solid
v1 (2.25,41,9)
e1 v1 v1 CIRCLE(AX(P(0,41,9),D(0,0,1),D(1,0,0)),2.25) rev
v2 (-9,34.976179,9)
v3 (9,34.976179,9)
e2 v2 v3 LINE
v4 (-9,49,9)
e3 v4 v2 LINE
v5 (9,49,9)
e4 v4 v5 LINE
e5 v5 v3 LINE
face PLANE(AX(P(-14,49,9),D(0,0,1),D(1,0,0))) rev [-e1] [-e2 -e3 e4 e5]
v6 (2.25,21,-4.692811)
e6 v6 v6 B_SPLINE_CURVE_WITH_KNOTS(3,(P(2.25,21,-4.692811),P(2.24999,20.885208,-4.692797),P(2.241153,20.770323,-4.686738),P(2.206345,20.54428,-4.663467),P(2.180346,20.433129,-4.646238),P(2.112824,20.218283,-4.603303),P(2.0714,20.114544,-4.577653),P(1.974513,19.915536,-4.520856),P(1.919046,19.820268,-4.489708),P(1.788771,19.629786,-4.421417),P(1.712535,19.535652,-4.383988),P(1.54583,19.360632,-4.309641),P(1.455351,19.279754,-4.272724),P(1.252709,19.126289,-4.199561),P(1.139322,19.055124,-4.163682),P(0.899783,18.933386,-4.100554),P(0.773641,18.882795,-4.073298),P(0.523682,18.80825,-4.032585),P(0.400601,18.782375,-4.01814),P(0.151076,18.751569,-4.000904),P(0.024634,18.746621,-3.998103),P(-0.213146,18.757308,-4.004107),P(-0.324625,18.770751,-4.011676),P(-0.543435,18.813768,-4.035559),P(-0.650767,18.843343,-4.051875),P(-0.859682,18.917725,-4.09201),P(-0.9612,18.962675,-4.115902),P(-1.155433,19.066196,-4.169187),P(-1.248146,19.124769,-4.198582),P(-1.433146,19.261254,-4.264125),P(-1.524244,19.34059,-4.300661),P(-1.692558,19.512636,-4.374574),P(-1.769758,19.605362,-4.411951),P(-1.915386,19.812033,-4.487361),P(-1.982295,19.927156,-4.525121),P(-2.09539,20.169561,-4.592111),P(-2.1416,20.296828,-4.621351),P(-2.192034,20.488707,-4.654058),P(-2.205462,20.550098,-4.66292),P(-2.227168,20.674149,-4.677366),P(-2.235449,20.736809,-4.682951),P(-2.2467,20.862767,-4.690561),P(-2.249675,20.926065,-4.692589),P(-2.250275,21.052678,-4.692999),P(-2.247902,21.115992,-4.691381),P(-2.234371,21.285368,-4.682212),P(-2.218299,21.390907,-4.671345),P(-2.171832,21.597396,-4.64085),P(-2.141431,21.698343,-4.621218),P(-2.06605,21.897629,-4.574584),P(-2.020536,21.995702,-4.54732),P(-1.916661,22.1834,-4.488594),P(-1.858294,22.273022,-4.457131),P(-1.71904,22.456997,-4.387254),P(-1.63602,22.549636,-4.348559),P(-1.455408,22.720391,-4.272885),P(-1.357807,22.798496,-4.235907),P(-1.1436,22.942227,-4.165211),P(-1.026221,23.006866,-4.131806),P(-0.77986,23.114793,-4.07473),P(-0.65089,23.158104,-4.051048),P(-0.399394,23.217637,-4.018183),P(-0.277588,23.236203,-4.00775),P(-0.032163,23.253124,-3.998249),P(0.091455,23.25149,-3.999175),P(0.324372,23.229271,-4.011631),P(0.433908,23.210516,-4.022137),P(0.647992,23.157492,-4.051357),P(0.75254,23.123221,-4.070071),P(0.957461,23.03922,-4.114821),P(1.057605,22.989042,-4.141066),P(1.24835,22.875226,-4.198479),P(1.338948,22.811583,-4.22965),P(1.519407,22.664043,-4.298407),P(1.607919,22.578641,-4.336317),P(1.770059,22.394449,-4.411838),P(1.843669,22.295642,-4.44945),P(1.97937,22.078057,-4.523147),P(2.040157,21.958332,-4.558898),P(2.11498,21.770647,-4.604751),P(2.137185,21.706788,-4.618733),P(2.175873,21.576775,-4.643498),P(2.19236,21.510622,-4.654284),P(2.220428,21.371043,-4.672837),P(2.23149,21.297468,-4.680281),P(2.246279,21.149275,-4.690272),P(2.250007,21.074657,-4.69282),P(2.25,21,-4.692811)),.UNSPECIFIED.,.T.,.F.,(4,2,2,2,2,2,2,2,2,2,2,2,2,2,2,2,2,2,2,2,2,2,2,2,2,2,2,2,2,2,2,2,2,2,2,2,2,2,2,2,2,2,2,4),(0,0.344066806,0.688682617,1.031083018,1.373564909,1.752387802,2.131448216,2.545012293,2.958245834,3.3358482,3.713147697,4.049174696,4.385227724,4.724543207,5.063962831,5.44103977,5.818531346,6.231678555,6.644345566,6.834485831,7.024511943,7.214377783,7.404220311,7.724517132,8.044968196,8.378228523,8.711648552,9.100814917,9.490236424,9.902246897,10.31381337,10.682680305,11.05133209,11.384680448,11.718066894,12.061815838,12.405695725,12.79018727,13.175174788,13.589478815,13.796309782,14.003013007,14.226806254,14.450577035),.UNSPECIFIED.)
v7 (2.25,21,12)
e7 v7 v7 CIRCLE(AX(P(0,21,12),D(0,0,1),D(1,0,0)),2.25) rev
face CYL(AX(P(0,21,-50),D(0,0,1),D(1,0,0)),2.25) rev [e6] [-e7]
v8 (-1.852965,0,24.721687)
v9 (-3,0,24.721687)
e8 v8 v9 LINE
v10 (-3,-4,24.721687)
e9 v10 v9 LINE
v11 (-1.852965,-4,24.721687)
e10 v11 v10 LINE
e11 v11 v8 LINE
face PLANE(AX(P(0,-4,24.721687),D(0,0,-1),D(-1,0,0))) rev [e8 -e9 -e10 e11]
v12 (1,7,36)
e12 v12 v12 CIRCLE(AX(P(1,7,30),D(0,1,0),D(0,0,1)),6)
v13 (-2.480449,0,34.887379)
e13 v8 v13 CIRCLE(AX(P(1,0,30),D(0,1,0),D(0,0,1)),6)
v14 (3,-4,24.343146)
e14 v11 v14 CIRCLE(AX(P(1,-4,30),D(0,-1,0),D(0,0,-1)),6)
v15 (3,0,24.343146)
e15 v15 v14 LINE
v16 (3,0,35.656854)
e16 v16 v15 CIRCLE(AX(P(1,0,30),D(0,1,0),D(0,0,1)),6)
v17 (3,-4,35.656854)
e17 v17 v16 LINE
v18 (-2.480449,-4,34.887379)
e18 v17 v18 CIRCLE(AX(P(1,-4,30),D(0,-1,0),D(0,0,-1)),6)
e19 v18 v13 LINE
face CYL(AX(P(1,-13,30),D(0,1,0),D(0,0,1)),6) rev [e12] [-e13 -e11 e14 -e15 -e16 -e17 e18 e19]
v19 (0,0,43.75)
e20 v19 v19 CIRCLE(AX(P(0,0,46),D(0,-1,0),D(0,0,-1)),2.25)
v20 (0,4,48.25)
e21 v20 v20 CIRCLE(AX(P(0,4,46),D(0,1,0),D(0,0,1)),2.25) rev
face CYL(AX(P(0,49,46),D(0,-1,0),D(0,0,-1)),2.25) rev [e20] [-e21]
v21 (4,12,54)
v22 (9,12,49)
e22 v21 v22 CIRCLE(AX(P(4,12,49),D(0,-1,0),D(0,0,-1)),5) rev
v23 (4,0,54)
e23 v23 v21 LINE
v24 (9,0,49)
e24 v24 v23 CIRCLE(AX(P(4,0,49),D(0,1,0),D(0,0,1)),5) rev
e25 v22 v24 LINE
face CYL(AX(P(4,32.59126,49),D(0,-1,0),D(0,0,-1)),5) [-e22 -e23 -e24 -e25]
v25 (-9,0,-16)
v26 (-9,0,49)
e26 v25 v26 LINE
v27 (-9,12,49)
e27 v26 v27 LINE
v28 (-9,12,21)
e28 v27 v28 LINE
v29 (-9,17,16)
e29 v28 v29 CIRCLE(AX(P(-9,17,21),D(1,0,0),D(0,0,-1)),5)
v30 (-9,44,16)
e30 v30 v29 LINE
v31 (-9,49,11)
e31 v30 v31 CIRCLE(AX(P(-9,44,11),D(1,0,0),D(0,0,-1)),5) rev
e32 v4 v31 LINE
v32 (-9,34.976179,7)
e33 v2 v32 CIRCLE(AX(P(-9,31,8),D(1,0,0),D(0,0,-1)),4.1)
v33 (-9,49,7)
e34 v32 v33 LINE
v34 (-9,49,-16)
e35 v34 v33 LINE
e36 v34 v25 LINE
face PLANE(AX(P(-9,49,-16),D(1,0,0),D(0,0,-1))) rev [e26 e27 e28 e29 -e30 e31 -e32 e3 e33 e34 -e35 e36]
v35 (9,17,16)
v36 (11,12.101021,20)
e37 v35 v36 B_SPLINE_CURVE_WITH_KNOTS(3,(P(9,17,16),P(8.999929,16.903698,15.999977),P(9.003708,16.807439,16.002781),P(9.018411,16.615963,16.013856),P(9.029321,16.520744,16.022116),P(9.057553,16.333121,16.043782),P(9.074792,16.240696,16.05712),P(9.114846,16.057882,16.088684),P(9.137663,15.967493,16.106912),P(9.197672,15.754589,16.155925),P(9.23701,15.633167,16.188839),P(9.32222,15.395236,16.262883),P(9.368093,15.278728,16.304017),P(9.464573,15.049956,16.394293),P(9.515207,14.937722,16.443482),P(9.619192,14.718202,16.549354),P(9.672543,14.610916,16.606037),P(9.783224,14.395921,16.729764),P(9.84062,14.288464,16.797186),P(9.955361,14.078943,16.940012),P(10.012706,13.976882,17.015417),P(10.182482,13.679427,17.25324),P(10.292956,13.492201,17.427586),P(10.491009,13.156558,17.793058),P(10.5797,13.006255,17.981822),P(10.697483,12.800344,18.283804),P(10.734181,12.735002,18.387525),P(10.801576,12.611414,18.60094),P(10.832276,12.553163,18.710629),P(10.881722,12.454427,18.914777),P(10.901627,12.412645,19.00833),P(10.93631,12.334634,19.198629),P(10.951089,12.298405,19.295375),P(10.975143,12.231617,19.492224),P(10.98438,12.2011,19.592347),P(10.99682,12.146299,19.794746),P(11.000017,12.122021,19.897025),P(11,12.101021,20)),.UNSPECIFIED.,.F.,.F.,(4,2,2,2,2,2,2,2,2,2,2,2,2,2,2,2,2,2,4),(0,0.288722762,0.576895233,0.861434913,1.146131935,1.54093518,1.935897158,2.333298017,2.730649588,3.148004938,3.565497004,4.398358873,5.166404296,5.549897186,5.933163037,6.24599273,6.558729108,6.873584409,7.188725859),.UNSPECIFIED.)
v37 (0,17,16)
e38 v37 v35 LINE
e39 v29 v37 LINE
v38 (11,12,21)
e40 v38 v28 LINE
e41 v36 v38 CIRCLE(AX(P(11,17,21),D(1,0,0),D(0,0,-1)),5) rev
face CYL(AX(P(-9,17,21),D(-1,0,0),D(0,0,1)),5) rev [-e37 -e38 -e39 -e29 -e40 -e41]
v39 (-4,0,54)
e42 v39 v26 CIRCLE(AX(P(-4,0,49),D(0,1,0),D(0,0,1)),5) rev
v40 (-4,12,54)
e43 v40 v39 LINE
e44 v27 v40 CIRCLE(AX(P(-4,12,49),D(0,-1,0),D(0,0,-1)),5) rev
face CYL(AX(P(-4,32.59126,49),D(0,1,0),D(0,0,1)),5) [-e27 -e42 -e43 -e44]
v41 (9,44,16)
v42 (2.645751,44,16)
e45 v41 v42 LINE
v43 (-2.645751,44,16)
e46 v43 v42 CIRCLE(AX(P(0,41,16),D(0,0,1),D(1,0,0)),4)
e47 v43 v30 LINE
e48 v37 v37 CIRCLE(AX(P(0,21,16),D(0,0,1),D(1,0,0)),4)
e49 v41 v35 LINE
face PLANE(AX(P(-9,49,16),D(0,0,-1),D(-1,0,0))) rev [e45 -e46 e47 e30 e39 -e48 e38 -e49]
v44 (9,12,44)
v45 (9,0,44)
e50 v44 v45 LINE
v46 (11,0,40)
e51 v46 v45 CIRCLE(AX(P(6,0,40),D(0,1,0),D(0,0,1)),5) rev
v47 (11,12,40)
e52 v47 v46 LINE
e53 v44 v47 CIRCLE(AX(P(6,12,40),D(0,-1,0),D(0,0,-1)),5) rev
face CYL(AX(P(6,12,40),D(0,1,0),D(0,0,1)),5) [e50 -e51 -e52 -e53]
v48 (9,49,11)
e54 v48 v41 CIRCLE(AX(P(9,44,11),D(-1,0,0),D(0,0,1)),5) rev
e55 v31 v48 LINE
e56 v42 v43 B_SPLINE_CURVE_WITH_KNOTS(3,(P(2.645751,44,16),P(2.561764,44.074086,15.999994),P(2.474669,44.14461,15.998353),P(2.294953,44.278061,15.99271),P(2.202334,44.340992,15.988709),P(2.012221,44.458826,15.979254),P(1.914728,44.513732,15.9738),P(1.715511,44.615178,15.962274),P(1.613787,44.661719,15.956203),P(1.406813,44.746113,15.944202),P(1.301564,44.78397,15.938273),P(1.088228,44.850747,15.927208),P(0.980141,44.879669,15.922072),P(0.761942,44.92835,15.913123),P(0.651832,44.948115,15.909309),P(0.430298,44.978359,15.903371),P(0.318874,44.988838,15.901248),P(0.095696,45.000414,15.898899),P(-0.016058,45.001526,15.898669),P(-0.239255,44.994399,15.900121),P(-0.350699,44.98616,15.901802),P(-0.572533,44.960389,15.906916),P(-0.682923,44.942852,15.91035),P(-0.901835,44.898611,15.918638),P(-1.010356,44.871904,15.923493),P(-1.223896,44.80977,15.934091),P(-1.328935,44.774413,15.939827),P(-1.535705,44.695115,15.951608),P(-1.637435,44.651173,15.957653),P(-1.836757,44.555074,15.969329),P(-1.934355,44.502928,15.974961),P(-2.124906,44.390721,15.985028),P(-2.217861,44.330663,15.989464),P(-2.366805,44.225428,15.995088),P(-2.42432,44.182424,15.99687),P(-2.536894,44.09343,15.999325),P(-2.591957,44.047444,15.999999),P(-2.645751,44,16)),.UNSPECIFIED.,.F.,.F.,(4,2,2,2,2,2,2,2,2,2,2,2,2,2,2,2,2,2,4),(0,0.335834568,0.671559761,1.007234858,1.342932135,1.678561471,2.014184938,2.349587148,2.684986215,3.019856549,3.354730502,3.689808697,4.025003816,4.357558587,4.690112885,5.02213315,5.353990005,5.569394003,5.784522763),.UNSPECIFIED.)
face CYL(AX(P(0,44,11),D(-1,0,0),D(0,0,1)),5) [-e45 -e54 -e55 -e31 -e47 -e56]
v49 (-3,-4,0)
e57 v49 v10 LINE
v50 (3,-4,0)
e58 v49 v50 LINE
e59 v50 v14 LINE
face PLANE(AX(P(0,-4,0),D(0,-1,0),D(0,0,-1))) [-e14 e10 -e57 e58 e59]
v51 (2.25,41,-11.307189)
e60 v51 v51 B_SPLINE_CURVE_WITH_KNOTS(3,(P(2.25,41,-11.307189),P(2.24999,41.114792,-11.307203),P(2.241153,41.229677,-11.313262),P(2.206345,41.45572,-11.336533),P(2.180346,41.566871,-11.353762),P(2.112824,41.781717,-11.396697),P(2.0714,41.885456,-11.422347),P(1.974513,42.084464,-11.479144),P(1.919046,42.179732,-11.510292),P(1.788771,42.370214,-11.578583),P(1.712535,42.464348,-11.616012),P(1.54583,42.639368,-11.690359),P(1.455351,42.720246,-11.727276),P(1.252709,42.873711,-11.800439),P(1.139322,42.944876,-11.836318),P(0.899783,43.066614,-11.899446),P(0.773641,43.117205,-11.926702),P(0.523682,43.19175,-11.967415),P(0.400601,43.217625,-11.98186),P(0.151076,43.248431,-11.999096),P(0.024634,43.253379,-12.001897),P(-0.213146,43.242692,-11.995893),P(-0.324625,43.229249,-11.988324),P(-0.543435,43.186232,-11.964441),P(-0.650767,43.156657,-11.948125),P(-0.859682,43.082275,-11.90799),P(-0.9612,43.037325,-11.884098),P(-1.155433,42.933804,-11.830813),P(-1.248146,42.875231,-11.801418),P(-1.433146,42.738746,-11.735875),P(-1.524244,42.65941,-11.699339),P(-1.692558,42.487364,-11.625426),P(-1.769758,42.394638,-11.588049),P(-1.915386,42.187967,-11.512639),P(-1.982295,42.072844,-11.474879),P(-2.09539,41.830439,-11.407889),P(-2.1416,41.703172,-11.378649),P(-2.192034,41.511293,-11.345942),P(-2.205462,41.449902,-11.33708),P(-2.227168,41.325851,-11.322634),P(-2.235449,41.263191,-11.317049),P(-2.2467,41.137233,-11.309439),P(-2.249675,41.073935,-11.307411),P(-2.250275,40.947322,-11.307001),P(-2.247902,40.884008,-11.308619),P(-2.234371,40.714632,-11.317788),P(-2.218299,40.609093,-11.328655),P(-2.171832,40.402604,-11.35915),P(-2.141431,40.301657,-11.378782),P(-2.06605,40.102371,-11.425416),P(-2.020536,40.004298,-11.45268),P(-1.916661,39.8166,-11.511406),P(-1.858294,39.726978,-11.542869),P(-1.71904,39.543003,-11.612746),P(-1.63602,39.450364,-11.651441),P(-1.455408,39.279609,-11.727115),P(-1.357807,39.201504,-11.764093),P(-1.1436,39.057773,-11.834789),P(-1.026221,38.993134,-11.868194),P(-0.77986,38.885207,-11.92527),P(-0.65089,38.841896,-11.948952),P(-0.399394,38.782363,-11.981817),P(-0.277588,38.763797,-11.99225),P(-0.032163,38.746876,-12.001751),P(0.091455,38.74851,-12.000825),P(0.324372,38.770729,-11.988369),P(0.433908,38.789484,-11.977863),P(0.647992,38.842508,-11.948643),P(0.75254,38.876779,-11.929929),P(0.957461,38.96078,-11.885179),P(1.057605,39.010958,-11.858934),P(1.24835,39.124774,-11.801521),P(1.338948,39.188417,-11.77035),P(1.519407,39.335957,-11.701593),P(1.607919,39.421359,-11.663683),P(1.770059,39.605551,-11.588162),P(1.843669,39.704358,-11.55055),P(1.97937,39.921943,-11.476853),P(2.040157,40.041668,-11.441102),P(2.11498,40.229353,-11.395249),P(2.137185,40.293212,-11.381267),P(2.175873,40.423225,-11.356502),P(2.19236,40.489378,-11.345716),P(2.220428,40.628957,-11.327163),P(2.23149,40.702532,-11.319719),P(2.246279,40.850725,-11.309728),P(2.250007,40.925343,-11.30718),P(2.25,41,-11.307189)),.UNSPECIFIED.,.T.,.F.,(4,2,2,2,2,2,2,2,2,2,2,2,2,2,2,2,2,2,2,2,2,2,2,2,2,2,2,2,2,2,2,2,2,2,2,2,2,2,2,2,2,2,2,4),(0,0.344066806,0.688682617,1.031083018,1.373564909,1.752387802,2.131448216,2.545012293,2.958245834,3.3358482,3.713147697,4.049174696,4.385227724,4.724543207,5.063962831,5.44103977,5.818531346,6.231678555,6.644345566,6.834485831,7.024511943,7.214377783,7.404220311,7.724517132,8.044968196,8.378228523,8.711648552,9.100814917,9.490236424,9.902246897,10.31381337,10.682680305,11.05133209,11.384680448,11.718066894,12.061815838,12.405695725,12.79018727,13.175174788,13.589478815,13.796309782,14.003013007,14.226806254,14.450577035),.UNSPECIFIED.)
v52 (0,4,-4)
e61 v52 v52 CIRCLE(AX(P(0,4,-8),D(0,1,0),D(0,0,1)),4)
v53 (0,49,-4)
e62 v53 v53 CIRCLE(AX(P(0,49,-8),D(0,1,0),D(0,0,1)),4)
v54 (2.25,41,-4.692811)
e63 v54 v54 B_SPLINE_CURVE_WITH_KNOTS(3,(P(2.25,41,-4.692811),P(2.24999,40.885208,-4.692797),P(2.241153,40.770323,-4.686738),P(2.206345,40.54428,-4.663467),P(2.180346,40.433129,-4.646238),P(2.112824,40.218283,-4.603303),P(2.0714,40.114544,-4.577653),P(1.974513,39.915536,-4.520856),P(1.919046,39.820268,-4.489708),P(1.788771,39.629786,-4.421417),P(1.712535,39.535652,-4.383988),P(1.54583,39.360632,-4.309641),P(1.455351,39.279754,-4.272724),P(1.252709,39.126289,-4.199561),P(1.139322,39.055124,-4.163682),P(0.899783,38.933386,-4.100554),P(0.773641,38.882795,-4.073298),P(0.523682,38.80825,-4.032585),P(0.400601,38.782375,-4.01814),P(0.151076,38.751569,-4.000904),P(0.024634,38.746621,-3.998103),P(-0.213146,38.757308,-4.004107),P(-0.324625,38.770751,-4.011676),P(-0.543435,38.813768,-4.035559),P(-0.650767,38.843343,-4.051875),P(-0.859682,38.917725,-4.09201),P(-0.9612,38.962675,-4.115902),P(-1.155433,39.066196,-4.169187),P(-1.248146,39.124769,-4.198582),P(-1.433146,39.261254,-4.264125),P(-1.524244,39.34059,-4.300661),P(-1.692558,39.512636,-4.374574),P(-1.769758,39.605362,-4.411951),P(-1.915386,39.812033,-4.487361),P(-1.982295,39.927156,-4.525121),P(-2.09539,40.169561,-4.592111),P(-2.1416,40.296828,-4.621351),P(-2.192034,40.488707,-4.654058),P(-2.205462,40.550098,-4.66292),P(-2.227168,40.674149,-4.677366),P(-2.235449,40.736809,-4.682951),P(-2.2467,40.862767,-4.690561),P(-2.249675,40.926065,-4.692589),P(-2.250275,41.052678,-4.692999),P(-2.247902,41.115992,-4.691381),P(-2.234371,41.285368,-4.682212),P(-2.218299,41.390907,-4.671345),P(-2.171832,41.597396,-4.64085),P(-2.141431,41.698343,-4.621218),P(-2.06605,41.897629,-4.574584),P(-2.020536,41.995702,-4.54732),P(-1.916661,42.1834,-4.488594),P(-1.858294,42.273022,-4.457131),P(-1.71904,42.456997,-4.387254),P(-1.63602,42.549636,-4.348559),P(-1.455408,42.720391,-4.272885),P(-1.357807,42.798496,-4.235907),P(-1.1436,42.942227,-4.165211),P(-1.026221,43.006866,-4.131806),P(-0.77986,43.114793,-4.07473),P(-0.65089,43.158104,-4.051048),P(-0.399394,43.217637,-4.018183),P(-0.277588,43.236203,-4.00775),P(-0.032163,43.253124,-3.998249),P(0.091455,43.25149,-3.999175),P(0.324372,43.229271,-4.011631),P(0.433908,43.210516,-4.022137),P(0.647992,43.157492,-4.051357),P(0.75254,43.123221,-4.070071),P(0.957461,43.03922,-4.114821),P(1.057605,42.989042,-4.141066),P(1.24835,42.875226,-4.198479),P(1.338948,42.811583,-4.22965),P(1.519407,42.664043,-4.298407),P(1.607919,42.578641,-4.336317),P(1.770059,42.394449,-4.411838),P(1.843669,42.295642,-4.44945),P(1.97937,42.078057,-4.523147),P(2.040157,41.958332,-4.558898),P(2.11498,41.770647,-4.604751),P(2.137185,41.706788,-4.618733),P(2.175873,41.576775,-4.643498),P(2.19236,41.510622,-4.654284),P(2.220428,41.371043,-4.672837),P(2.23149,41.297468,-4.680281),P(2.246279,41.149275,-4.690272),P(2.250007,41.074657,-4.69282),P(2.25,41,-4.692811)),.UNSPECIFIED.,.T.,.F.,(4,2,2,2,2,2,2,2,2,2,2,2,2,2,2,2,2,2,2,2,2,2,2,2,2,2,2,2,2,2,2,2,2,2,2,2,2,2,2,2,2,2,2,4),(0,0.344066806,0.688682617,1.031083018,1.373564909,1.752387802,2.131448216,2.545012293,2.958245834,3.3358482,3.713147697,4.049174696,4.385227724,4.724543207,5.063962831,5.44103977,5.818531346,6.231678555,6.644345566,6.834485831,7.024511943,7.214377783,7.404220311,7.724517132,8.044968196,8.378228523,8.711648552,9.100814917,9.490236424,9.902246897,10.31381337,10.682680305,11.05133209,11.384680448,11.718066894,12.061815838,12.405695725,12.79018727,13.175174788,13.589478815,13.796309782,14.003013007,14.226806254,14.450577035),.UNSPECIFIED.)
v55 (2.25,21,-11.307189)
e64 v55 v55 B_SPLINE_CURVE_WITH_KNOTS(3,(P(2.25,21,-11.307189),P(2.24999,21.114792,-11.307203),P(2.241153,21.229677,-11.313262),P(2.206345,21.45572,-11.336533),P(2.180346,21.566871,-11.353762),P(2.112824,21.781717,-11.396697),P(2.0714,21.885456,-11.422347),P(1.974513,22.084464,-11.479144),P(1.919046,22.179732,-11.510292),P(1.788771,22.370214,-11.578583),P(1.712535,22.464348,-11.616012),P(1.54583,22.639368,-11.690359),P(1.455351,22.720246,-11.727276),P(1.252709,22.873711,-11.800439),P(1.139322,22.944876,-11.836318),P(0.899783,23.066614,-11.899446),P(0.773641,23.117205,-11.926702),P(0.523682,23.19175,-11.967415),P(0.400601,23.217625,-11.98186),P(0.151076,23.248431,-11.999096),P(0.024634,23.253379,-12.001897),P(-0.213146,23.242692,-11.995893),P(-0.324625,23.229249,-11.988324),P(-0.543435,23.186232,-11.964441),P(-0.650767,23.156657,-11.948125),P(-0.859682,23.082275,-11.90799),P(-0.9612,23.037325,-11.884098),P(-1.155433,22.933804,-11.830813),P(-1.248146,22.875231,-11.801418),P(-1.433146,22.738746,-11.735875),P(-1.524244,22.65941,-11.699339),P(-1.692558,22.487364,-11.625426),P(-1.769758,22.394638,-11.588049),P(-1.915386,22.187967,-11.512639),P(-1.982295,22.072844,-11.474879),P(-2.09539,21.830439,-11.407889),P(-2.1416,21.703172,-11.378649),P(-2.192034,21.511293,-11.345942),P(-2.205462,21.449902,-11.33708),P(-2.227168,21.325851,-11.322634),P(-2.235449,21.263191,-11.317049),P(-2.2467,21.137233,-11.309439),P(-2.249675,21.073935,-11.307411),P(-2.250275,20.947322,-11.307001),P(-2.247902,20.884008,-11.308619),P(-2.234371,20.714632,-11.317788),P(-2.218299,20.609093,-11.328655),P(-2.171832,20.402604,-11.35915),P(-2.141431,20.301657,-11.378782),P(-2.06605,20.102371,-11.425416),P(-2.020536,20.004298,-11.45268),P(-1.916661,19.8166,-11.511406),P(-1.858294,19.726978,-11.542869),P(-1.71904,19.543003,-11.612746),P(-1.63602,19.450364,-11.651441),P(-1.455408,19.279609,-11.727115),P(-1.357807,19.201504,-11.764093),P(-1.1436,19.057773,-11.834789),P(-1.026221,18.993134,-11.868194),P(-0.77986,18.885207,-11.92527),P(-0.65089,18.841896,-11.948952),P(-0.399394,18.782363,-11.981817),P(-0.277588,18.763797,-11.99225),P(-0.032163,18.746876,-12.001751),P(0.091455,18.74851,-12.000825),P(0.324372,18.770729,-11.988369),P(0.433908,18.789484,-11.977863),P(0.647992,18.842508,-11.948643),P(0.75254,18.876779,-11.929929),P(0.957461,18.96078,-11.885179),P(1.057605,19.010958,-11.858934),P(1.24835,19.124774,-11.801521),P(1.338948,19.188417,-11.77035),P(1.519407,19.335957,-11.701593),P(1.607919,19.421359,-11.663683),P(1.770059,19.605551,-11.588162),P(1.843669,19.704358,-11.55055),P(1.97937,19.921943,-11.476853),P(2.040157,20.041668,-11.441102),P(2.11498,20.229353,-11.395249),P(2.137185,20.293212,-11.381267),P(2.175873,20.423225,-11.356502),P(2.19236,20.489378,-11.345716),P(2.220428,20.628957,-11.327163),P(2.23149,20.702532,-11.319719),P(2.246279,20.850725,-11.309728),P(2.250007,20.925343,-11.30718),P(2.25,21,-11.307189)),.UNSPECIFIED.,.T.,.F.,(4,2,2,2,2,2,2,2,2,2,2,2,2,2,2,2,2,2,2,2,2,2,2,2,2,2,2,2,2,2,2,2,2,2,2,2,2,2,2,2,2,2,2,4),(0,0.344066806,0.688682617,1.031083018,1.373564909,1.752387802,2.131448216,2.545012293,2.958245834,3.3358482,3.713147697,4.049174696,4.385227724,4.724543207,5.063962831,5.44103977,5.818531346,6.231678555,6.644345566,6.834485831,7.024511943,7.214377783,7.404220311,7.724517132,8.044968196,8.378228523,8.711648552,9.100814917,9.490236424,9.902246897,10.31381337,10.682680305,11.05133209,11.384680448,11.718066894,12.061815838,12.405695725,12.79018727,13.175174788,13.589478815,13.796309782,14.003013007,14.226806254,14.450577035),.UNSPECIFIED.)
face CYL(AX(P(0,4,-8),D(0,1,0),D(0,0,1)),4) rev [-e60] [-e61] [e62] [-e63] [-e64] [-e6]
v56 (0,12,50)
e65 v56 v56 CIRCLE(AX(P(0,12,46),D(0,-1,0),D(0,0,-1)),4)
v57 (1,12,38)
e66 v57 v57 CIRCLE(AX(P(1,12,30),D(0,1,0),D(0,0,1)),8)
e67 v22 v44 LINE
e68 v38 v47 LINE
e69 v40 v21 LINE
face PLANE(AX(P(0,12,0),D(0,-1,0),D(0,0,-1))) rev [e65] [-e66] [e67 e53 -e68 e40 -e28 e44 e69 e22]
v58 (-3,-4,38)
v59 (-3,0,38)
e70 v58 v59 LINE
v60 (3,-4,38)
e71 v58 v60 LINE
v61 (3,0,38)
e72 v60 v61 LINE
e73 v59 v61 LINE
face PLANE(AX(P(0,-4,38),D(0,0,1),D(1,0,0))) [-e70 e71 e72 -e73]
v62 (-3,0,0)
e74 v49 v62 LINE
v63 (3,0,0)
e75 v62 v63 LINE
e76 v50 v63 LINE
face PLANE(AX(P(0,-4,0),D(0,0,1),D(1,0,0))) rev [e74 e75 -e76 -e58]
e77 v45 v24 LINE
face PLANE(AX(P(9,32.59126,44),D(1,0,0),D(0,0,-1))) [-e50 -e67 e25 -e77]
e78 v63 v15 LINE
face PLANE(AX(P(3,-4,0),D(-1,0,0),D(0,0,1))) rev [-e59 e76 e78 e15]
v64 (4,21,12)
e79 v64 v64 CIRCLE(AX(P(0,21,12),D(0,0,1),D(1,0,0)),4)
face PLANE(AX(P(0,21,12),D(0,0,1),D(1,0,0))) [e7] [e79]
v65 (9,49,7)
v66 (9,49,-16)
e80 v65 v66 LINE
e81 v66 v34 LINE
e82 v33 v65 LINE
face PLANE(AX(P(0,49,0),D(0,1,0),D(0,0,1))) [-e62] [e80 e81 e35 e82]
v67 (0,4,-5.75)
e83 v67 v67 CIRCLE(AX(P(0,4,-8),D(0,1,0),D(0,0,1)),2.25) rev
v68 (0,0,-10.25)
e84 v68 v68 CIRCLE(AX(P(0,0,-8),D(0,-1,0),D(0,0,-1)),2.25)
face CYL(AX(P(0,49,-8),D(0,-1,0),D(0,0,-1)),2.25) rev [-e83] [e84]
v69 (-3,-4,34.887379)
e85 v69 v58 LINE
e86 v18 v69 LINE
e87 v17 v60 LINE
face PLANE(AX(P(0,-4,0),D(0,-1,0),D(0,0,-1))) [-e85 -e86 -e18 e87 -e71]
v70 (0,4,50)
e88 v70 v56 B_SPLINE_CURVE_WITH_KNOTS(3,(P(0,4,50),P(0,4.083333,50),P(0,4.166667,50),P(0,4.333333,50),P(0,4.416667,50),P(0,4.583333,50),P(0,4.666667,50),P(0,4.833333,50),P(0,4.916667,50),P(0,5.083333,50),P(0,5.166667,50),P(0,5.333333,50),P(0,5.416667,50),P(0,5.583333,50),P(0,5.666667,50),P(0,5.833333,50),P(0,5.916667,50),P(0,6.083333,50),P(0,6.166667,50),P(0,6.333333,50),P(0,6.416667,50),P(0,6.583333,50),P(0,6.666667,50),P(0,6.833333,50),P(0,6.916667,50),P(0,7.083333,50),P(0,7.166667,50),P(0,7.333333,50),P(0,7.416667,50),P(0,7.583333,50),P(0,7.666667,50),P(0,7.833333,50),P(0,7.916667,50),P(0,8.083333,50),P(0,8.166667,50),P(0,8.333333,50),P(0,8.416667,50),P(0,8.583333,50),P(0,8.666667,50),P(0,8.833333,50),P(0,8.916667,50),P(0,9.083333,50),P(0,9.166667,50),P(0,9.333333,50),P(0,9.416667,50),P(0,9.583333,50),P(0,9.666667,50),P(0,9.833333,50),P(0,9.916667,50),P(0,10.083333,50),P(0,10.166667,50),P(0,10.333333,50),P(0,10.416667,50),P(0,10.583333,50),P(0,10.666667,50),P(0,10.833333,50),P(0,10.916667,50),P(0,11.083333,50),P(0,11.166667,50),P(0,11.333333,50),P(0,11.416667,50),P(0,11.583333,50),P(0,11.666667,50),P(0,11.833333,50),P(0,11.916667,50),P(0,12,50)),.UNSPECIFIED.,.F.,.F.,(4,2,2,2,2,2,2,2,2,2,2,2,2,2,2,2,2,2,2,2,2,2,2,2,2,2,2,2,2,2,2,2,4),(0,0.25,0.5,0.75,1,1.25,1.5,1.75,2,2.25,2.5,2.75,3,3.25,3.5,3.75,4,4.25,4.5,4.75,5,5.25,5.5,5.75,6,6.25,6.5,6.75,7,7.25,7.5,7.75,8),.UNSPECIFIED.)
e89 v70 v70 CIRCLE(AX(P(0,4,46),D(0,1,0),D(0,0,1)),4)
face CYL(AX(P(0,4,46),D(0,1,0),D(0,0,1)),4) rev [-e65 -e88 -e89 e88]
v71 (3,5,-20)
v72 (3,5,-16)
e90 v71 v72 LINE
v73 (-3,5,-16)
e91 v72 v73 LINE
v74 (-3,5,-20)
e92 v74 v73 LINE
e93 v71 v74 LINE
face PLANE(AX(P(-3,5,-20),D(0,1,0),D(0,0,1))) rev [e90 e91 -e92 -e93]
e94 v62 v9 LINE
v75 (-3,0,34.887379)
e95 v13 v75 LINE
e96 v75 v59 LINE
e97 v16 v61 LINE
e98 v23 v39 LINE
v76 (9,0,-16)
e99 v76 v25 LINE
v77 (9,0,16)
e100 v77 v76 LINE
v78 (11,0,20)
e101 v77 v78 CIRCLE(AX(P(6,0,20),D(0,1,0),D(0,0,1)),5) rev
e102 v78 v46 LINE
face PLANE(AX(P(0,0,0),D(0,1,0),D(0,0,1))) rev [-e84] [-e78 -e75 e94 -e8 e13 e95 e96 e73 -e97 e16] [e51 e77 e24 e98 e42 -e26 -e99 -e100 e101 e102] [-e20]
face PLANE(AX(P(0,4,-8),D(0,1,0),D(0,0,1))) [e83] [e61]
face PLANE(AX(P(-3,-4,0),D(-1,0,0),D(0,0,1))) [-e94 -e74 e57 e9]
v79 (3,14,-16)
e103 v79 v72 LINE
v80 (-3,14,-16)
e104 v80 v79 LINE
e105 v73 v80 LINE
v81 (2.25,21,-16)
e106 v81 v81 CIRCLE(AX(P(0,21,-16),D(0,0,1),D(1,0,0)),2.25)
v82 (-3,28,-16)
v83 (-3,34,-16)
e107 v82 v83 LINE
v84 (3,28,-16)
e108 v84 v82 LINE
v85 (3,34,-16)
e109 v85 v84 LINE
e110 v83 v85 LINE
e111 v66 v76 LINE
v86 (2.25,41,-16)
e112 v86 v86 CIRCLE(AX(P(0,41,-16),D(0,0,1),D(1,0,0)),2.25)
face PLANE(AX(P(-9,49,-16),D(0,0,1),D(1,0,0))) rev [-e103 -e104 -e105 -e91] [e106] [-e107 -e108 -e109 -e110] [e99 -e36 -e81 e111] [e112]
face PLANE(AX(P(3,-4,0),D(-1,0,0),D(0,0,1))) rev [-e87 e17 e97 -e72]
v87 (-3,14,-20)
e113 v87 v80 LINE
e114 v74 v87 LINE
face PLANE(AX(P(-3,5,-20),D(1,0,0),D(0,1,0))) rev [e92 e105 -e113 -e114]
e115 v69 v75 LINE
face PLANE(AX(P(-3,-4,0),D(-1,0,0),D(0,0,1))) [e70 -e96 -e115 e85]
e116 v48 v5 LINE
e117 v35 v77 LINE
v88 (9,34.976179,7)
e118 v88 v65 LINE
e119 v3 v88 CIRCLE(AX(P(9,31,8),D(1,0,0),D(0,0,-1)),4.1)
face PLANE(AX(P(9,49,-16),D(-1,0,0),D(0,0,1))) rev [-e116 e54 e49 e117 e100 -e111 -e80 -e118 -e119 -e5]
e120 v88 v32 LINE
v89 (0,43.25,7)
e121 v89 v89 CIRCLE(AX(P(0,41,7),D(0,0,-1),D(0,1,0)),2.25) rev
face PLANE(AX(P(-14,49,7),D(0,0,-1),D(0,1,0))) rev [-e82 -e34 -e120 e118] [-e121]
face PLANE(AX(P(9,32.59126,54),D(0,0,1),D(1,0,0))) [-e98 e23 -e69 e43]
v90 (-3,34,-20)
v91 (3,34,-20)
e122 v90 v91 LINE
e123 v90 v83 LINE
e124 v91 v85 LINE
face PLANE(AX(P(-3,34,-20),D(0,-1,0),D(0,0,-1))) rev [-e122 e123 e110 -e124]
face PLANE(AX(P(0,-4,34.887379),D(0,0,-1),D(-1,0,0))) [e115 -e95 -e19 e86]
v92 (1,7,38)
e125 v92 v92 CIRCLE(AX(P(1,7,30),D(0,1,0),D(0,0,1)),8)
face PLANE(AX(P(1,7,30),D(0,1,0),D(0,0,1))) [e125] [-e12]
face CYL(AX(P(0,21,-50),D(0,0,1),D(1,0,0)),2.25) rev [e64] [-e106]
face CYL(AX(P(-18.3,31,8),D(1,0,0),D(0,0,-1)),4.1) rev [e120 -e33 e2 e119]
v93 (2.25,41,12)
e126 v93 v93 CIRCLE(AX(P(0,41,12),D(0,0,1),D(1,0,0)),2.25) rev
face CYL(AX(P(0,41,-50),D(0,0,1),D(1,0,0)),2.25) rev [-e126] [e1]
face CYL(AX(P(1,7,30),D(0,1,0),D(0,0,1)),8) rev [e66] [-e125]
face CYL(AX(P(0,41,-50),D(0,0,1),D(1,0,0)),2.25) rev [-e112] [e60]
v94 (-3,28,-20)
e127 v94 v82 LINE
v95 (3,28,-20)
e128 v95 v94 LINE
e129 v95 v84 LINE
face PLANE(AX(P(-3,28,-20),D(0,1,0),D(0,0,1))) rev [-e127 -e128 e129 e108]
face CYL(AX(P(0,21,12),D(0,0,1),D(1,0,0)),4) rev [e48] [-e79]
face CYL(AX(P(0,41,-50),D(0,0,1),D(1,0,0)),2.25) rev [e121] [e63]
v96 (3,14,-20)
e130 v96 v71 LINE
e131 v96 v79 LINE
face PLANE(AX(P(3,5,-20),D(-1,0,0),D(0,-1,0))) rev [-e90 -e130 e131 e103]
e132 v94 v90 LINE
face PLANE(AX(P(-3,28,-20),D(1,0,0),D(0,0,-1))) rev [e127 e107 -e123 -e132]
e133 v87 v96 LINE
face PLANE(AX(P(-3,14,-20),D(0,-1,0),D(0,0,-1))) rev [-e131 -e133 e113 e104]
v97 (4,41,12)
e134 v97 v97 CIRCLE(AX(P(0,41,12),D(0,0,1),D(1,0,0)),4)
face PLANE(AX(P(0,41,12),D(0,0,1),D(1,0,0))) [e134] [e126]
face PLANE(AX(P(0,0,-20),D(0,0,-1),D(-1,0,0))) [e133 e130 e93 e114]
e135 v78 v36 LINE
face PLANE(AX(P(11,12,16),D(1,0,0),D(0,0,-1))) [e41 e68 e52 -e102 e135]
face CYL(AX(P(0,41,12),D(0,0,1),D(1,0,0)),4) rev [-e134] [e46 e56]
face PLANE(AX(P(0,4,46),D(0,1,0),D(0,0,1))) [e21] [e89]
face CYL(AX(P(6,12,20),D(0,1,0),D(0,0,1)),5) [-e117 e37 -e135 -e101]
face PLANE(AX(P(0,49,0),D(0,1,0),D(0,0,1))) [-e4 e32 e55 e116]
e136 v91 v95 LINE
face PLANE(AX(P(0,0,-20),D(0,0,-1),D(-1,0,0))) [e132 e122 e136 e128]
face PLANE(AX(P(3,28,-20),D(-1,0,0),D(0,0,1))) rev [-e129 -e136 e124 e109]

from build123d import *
from build123d.topology import SkipClean

# Parameters (mm, degrees)
SKETCH_2_W          = 18
SKETCH_2_H          = 32
EXTRUDE_1_DEPTH     = 49
SKETCH_3_R          = 4.1
CUT_EXTRUDE_1_DEPTH = 27.3
SKETCH_16_W         = 20
SKETCH_16_H         = 28
EXTRUDE_3_DEPTH     = 12
SKETCH_17_R         = 2.25
CUT_EXTRUDE_3_DEPTH = 66
SKETCH_18_W         = 6
SKETCH_18_H         = 9
SKETCH_18_H_2       = 6
EXTRUDE_4_DEPTH     = 4
SKETCH_19_R         = 4
CUT_EXTRUDE_4_DEPTH = 4
SKETCH_23_W         = 18
SKETCH_23_H         = 10
EXTRUDE_5_DEPTH     = 12
SKETCH_4_R          = 2.25
CUT_EXTRUDE_2_DEPTH = 74.742796258
SKETCH_20_R         = 8
SKETCH_20_R_2       = 6
CUT_EXTRUDE_5_DEPTH = 5
SKETCH_8_W          = 6
SKETCH_8_H          = 3.112620607
SKETCH_8_H_2        = 24.721686793
EXTRUDE_7_DEPTH     = 4
SKETCH_20_4_R       = 6
CUT_EXTRUDE_7_DEPTH = 25
FILLET_1_R          = 5
FILLET_START        = -1
FILLET_2_DEPTH      = 13
FILLET_START_2      = -9
FILLET_2_2_DEPTH    = 18.34805991
FILLET_2_3_DEPTH    = 20
FILLET_2_4_DEPTH    = 19
SKETCH_24_W         = 2
SKETCH_24_H         = 18
CUT_EXTRUDE_8_DEPTH = 23
SKETCH_25_R         = 4
CUT_EXTRUDE_9_DEPTH = 45


with BuildPart() as part:
    # Эскиз2 → Бобышка-Вытянуть1 (new body)
    with BuildSketch(Plane(origin=(0, 0, 0), x_dir=(1, 0, 0), z_dir=(0, 1, 0))):
        Rectangle(SKETCH_2_W, SKETCH_2_H)
    extrude(amount=EXTRUDE_1_DEPTH)

    # Эскиз3 → Вырез-Вытянуть1 (cut)
    with BuildSketch(Plane(origin=(9, 0, -3.279463983), x_dir=(0, 0, -1), z_dir=(1, 0, 0))):
        with Locations((-11.279463983, 31)):
            Circle(SKETCH_3_R)
    extrude(amount=-CUT_EXTRUDE_1_DEPTH, mode=Mode.SUBTRACT)

    # Эскиз16 → Бобышка-Вытянуть3 (add)
    with BuildSketch(Plane.XZ):
        with Locations((1, 30)):
            Rectangle(SKETCH_16_W, SKETCH_16_H)
    extrude(amount=-EXTRUDE_3_DEPTH)

    # Эскиз17 → Вырез-Вытянуть3 (cut)
    with BuildSketch(Plane.XY.offset(16)):
        with Locations((0, 41)):
            Circle(SKETCH_17_R)
        with Locations((0, 21)):
            Circle(SKETCH_17_R)
    extrude(amount=-CUT_EXTRUDE_3_DEPTH, mode=Mode.SUBTRACT)

    # Эскиз18 → Бобышка-Вытянуть4 (add)
    with BuildSketch(Plane(origin=(0, 0, -16), x_dir=(-1, 0, 0), z_dir=(0, 0, -1))):
        with Locations((0, 9.5)):
            Rectangle(SKETCH_18_W, SKETCH_18_H)
        with Locations((0, 31)):
            Rectangle(SKETCH_18_W, SKETCH_18_H_2)
    extrude(amount=EXTRUDE_4_DEPTH)

    # Эскиз19 → Вырез-Вытянуть4 (cut)
    with BuildSketch(Plane.XY.offset(16)):
        with Locations((0, 21)):
            Circle(SKETCH_19_R)
        with Locations((0, 41)):
            Circle(SKETCH_19_R)
    extrude(amount=-CUT_EXTRUDE_4_DEPTH, mode=Mode.SUBTRACT)

    # Эскиз23 → Бобышка-Вытянуть5 (add)
    with BuildSketch(Plane.XZ):
        with Locations((0, 49)):
            Rectangle(SKETCH_23_W, SKETCH_23_H)
    extrude(amount=-EXTRUDE_5_DEPTH)

    # Эскиз4 → Вырез-Вытянуть2 (cut, through all)
    with BuildSketch(Plane.XZ):
        with Locations(Location((0, 46, 0), (0, 0, 270))):
            Circle(SKETCH_4_R)
        with Locations(Location((0, -8, 0), (0, 0, 270))):
            Circle(SKETCH_4_R)
    extrude(amount=-CUT_EXTRUDE_2_DEPTH, mode=Mode.SUBTRACT)

    # Эскиз20 → Вырез-Вытянуть5 (cut)
    with BuildSketch(Plane(origin=(0, 12, 0), x_dir=(1, 0, 0), z_dir=(0, 1, 0))):
        with Locations(Location((1, -30, 0), (0, 0, 270))):
            Circle(SKETCH_20_R)
        with Locations(Location((1, -30, 0), (0, 0, 270))):
            Circle(SKETCH_20_R_2, mode=Mode.SUBTRACT)
    extrude(amount=-CUT_EXTRUDE_5_DEPTH, mode=Mode.SUBTRACT)

    # Эскиз8 → Бобышка-Вытянуть7 (add)
    with BuildSketch(Plane.XZ):
        with Locations((0, 36.443689697)):
            Rectangle(SKETCH_8_W, SKETCH_8_H)
        with Locations((0, 12.360843396)):
            Rectangle(SKETCH_8_W, SKETCH_8_H_2)
    extrude(amount=EXTRUDE_7_DEPTH)

    # Эскиз20<4> → Вырез-Вытянуть7 (cut)
    with BuildSketch(Plane(origin=(0, 12, 0), x_dir=(1, 0, 0), z_dir=(0, 1, 0))):
        with Locations(Location((1, -30, 0), (0, 0, 270))):
            Circle(SKETCH_20_4_R)
    extrude(amount=-CUT_EXTRUDE_7_DEPTH, mode=Mode.SUBTRACT)

    # Скругление1
    # the kernel refuses this fillet: 5 mm, written as the material it takes off along each edge
    with BuildSketch(Plane(origin=(11, -10, 44), x_dir=(0, 0, -1), z_dir=(0, 1, 0))) as fillet_1_piece_1:
        with BuildLine():
            CenterArc((4, 5), FILLET_1_R, 216.869897646, 53.130102354)
            Line((0, 2), (-0.08, 1.94))
            ThreePointArc((-0.08, 1.94), (-0.1, 1), (-0.1, 0))
            Line((-0.1, 0), (0, -0.1))
            Line((0, -0.1), (4, -0.1))
            Line((4, -0.1), (4, 0))
        make_face()
    extrude(amount=32, mode=Mode.SUBTRACT)
    with BuildSketch(Plane(origin=(11, -10, 16), x_dir=(-1, 0, 0), z_dir=(0, 1, 0))) as fillet_1_piece_2:
        with BuildLine():
            CenterArc((5, 4), FILLET_1_R, 180, 53.130102354)
            Line((0, 4), (-0.1, 4))
            Line((-0.1, 4), (-0.1, 0))
            Line((-0.1, 0), (0, -0.1))
            ThreePointArc((0, -0.1), (1, -0.1), (1.94, -0.08))
            Line((1.94, -0.08), (2, 0))
        make_face()
    extrude(amount=32, mode=Mode.SUBTRACT)

    # Скругление2: read off the stored shape, not the designer's step
    # Скругление2 outline → Скругление2 (cut)
    with BuildSketch(Plane(origin=(0, 0, 0), x_dir=(1, 0, 0), z_dir=(0, 1, 0)).offset(FILLET_START)):
        with BuildLine():
            Line((9, -54), (9, -49))
            ThreePointArc((9, -49), (7.535533906, -52.535533906), (4, -54))
            Line((4, -54), (9, -54))
        make_face()
    extrude(amount=FILLET_2_DEPTH, mode=Mode.SUBTRACT)

    # Fillet 2 2 outline → Fillet 2 2 (cut)
    with BuildSketch(Plane.YZ.offset(FILLET_START_2)):
        with BuildLine():
            Line((49, 16), (44, 16))
            ThreePointArc((44, 16), (47.535533906, 14.535533906), (49, 11))
            Line((49, 11), (49, 16))
        make_face()
    extrude(amount=FILLET_2_2_DEPTH, mode=Mode.SUBTRACT)

    # Fillet 2 3 outline → Fillet 2 3 (add)
    with BuildSketch(Plane.YZ.offset(FILLET_START_2)):
        with BuildLine():
            Line((12, 16), (17, 16))
            ThreePointArc((17, 16), (13.464466094, 17.464466094), (12, 21))
            Line((12, 21), (12, 16))
        make_face()
    extrude(amount=FILLET_2_3_DEPTH)

    # Fillet 2 4 outline → Fillet 2 4 (cut)
    with SkipClean():  # the faces are left unmerged after this step: merging them gives an invalid solid
        with BuildSketch(Plane(origin=(0, 0, 0), x_dir=(1, 0, 0), z_dir=(0, 1, 0)).offset(FILLET_START)):
            with BuildLine():
                ThreePointArc((8.999983996, -15.999987997), (10.472131482, -17.763923076), (11, -20))
                Line((11, -20), (11, -16))
                Line((11, -16), (8.999983996, -15.999987997))
            make_face()
            with BuildLine():
                ThreePointArc((-4, -54), (-7.535533906, -52.535533906), (-9, -49))
                Line((-9, -49), (-9, -54))
                Line((-9, -54), (-4, -54))
            make_face()
        extrude(amount=FILLET_2_4_DEPTH, mode=Mode.SUBTRACT)

    # Эскиз24 → Вырез-Вытянуть8 (cut)
    with SkipClean():  # the faces are left unmerged after this step: merging them gives an invalid solid
        with BuildSketch(Plane(origin=(9, 0, 0), x_dir=(0, 0, -1), z_dir=(1, 0, 0))):
            with Locations((-8, 40)):
                Rectangle(SKETCH_24_W, SKETCH_24_H)
        extrude(amount=-CUT_EXTRUDE_8_DEPTH, mode=Mode.SUBTRACT)

    # Эскиз25 → Вырез-Вытянуть9 (cut)
    with SkipClean():  # the faces are left unmerged after this step: merging them gives an invalid solid
        with BuildSketch(Plane(origin=(0, 49, 0), x_dir=(1, 0, 0), z_dir=(0, 1, 0))):
            with Locations(Location((0, 8, 0), (0, 0, 270))):
                Circle(SKETCH_25_R)
            with Locations(Location((0, -46, 0), (0, 0, 270))):
                Circle(SKETCH_25_R)
        extrude(amount=-CUT_EXTRUDE_9_DEPTH, mode=Mode.SUBTRACT)


solid = part.part
